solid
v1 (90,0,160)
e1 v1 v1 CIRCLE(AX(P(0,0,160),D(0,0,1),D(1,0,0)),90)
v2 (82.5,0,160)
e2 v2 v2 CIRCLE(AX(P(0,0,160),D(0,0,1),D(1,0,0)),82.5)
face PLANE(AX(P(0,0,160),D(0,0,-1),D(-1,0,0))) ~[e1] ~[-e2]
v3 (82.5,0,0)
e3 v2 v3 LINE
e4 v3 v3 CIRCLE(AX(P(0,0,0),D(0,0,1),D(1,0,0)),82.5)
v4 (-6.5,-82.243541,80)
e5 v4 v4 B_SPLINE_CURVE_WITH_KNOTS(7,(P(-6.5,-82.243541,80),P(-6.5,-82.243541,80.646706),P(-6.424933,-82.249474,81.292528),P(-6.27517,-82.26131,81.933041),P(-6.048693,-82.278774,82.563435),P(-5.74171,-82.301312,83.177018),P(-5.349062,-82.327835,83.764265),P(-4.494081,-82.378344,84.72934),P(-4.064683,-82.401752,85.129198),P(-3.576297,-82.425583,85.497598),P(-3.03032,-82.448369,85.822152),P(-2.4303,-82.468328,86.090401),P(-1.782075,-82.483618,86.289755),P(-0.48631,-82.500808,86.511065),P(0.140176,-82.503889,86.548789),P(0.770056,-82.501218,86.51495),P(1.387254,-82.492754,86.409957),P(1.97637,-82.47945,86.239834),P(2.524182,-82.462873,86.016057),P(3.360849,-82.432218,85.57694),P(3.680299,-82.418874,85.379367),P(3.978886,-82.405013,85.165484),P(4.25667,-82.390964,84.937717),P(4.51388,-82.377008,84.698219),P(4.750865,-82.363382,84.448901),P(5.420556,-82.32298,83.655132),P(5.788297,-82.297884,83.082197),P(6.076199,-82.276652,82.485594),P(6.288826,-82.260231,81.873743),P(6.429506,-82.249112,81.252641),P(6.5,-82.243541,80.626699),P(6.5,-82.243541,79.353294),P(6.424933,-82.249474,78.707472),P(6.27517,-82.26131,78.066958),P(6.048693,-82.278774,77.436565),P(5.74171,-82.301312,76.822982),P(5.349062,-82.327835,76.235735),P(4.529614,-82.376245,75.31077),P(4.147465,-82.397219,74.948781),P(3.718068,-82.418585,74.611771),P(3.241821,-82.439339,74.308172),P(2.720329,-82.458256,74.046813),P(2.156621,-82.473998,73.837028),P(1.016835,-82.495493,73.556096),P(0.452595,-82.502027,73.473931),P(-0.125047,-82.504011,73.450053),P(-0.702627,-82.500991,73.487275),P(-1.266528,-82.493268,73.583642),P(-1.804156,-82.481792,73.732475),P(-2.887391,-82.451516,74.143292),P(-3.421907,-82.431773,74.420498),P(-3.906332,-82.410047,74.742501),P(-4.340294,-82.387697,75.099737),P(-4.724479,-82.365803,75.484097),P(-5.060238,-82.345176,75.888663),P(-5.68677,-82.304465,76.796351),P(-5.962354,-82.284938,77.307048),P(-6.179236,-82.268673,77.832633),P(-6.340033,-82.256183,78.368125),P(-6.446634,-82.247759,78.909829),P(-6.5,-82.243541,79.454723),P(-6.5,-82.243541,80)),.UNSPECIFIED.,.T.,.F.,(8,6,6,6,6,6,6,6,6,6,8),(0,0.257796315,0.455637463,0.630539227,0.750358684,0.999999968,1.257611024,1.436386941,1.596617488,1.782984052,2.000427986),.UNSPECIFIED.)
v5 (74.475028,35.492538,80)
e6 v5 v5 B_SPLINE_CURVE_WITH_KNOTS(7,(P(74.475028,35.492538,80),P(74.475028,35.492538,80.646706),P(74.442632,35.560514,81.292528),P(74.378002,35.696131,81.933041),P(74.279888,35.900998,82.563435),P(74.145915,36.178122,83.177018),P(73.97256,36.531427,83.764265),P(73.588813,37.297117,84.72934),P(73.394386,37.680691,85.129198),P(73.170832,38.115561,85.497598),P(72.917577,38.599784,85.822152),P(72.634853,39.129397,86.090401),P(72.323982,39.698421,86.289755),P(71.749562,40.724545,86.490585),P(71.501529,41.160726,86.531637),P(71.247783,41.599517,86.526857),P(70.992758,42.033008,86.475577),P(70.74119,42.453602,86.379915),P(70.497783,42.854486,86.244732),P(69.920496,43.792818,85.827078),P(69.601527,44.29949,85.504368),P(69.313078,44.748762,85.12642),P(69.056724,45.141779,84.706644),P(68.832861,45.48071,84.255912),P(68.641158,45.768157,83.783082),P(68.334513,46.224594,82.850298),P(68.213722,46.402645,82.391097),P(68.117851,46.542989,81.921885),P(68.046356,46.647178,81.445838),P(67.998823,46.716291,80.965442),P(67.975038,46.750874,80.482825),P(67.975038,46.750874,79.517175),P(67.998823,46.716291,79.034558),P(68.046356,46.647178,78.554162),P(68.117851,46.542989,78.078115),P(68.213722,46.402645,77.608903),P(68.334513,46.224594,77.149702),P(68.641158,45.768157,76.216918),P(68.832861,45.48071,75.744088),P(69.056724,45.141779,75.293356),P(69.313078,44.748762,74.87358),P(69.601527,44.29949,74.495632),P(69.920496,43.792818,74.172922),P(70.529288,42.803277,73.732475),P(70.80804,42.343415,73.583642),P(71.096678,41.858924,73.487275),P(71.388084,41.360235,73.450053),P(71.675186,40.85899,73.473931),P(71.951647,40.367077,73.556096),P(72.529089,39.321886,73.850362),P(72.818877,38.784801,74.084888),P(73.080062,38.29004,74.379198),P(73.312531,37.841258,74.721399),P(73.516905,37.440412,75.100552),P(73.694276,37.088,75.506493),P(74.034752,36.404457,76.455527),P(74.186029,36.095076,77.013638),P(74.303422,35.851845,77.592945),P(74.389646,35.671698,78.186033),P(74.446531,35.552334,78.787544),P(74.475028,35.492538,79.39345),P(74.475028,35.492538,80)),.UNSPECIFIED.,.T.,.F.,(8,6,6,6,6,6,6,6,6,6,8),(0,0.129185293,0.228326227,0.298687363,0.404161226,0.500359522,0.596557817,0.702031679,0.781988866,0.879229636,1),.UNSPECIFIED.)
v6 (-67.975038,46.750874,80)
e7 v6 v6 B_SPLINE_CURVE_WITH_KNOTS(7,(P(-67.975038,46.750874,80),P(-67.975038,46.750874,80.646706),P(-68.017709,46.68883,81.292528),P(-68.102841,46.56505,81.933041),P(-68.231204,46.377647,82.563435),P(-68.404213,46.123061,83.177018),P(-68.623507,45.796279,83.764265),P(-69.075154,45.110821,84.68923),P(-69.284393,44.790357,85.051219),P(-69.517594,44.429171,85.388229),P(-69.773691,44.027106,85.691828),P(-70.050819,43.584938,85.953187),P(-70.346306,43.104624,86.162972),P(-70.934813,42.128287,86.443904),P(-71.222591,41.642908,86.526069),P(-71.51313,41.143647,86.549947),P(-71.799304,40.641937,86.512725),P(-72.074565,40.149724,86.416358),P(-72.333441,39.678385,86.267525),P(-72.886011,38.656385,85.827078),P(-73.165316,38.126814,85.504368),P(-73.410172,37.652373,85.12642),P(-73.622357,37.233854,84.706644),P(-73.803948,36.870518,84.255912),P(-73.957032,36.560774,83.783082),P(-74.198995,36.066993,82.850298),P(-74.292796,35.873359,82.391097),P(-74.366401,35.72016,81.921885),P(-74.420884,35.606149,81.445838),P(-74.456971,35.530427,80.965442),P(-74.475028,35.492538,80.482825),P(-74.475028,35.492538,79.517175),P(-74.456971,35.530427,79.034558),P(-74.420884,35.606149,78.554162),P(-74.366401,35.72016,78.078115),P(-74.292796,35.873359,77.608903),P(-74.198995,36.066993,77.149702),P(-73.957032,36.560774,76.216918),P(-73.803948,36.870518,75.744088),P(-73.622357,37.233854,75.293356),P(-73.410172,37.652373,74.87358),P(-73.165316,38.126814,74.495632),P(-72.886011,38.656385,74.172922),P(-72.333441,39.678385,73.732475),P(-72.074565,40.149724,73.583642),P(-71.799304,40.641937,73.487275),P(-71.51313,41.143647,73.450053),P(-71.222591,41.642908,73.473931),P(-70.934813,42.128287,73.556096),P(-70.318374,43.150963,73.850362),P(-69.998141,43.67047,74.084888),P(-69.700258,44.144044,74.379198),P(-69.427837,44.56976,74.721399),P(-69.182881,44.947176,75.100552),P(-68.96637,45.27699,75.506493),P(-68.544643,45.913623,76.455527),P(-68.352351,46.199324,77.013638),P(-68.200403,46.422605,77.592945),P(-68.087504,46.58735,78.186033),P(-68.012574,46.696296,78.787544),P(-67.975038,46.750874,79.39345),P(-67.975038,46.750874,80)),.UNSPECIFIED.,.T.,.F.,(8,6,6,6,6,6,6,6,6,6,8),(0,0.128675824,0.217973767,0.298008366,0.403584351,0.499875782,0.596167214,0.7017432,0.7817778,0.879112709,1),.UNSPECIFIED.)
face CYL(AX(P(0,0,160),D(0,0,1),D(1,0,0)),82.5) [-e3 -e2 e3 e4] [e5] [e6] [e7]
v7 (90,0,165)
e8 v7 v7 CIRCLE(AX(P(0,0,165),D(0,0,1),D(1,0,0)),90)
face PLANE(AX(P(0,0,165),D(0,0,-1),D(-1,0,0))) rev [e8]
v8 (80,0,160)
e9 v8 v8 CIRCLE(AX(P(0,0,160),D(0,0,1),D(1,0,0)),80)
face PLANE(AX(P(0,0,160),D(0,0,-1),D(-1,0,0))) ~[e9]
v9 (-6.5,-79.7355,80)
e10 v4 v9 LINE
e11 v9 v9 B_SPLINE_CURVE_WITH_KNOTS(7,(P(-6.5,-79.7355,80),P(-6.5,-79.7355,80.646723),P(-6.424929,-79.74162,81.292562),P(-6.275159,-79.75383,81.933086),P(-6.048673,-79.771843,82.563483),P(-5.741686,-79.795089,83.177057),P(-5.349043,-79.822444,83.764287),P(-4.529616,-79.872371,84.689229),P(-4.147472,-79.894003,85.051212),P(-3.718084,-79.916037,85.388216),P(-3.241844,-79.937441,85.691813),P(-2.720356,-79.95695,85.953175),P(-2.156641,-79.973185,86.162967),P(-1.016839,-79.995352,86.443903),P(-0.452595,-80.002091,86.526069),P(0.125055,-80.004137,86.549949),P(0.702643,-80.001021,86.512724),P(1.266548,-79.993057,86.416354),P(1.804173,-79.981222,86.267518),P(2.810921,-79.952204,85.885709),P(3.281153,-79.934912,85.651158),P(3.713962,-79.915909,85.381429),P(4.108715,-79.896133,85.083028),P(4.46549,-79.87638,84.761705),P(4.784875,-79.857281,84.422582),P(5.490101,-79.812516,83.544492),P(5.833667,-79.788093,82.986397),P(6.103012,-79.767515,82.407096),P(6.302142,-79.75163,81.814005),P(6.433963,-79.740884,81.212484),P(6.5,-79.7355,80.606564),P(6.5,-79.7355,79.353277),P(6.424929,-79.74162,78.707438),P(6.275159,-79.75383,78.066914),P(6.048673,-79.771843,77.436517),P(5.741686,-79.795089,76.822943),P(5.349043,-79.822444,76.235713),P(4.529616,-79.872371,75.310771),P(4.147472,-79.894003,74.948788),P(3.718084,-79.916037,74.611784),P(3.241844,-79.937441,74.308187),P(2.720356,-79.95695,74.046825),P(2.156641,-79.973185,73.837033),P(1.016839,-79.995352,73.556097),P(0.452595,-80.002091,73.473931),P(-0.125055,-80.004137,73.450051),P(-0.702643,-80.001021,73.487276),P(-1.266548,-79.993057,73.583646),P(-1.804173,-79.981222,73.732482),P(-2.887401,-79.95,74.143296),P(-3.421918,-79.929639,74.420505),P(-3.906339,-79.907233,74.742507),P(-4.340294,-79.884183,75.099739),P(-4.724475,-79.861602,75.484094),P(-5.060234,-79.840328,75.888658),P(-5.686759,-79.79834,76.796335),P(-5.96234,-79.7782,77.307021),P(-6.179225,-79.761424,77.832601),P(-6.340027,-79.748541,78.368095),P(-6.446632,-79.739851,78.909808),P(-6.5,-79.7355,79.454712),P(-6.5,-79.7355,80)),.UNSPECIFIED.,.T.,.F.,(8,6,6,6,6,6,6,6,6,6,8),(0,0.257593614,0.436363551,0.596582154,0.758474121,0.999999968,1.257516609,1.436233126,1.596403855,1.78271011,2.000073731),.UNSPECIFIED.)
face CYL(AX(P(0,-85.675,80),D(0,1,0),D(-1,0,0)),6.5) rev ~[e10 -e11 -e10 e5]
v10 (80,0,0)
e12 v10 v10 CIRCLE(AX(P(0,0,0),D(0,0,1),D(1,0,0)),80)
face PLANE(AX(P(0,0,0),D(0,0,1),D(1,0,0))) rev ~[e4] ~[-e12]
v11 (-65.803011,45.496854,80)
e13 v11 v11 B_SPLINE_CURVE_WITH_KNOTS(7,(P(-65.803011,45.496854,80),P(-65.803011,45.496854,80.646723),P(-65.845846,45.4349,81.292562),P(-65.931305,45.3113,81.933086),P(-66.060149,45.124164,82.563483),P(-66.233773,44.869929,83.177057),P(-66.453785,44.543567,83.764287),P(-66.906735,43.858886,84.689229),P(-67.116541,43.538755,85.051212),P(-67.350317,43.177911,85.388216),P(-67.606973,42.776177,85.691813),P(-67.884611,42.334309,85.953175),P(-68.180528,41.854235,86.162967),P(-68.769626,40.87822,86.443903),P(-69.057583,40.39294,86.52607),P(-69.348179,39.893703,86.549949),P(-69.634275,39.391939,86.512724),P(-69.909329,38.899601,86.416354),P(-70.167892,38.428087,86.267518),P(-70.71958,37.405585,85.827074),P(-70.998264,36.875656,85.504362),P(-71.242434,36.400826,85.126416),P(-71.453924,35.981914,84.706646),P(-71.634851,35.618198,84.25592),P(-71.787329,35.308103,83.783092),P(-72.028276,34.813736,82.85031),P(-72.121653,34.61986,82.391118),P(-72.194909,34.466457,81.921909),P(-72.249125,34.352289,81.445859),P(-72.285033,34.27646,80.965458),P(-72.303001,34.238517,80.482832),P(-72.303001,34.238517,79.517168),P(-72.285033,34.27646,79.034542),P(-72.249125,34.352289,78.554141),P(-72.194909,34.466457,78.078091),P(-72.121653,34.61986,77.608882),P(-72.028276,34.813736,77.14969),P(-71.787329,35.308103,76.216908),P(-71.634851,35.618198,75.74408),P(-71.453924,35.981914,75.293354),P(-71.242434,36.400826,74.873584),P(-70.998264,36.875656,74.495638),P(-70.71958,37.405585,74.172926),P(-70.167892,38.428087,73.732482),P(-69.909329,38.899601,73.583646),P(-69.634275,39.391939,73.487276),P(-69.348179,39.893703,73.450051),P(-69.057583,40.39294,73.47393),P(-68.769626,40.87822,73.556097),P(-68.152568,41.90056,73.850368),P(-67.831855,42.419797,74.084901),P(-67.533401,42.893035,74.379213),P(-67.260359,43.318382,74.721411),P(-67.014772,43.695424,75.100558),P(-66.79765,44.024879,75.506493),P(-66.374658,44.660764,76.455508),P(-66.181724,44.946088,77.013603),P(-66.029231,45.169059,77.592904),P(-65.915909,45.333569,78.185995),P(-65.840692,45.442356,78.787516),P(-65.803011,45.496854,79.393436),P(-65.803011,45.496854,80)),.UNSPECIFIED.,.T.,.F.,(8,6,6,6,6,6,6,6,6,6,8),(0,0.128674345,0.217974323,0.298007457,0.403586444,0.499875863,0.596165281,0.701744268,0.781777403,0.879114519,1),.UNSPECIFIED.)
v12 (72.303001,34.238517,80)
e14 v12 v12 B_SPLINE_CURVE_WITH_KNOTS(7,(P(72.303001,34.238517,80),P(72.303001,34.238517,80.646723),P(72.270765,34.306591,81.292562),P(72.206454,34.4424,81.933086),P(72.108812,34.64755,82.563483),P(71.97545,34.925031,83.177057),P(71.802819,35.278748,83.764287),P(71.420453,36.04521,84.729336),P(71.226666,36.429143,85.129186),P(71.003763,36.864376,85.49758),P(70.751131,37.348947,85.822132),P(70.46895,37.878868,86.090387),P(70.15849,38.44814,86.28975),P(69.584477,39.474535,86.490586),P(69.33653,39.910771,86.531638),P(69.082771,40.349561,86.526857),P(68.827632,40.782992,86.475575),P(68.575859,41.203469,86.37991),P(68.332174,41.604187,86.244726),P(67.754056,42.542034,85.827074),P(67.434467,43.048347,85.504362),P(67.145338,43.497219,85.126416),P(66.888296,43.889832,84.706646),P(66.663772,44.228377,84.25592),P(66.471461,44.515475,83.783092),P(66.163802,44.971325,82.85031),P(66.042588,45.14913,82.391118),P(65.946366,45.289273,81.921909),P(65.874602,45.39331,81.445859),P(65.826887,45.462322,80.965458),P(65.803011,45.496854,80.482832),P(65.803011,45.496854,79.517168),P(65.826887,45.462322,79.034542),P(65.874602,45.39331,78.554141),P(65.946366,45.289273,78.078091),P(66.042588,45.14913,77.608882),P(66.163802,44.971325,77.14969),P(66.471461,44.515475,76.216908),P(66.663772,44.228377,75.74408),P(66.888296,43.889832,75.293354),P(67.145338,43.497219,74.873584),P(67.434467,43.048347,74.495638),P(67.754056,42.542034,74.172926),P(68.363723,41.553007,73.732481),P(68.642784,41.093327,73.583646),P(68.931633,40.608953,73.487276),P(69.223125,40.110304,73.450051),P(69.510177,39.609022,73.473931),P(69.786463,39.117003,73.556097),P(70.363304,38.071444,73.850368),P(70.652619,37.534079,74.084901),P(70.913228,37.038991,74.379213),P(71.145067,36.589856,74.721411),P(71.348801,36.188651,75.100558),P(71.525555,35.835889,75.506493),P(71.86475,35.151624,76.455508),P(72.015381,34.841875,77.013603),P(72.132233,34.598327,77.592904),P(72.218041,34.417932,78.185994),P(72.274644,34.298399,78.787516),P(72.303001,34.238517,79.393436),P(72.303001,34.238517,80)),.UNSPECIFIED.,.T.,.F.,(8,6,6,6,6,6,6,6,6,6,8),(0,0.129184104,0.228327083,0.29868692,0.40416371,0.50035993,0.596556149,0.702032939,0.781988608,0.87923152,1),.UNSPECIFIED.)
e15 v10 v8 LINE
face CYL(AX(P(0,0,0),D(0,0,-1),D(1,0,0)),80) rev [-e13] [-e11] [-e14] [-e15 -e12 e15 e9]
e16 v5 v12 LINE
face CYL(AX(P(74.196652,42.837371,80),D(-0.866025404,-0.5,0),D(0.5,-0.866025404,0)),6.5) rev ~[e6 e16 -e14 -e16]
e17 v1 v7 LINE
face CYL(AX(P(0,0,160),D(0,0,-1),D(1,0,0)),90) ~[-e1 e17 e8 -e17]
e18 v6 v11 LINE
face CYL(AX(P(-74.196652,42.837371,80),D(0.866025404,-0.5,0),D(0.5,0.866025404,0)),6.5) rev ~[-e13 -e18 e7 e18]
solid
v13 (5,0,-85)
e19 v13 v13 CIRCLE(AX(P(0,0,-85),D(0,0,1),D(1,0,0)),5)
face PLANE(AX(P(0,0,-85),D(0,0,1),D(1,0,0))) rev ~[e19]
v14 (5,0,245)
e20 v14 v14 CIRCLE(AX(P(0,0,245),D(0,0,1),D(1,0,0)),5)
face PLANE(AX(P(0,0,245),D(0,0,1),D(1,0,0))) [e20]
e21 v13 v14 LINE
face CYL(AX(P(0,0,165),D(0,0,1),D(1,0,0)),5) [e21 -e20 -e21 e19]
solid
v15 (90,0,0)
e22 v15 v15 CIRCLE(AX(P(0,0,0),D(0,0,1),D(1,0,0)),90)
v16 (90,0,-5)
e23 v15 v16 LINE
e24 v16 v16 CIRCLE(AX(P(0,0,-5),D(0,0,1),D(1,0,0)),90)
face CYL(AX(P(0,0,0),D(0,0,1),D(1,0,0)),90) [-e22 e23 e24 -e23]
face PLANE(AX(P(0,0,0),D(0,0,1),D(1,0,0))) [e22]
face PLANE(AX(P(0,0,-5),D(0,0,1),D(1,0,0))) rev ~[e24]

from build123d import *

# Parameters (mm, degrees)
F0_R            = 82.5
F0_R_2          = 80
F1_DEPTH        = 80
F0_R_3          = 90
F3_DEPTH        = 5
F7_D            = 13
F7_DEPTH        = 3.175
F7_TIP          = 3.9055940237
F7_COPIES_COUNT = 3
F8_R            = 5
F9_DEPTH        = 80
F9_DEPTH_BACK   = 250


# Not quite as in the source:
# - a pattern or mirror of a feature is missing from the dataset's text; its kind, count and spacing are read off the source's solid


with BuildPart() as f1:
    # F0 (on Top) → F1 (new body)
    with BuildSketch(Plane.XY):
        Circle(F0_R)
        Circle(F0_R_2, mode=Mode.SUBTRACT)
    extrude(amount=F1_DEPTH)

    # F4: F1, F3 across plane


with BuildPart() as f3:
    # F0 (on Top) → F3 (new body)
    with BuildSketch(Plane.XY):
        Circle(F0_R_3)
        Circle(F0_R, mode=Mode.SUBTRACT)
        Circle(F0_R)
        Circle(F0_R_2, mode=Mode.SUBTRACT)
        Circle(F0_R_2)
    extrude(amount=-F3_DEPTH)


with BuildPart() as f1_1:
    add(f1.part)
    add(f1.part.mirror(Plane.XY.offset(80)))
    add(f3.part.mirror(Plane.XY.offset(80)))

    # F7
    with Locations(Plane.XZ.offset(82.5)):
        with Locations((0, 80)):
            f7 = Hole(F7_D / 2, depth=F7_DEPTH)
            with Locations((0, 0, -(F7_DEPTH + F7_TIP / 2))):  # 118° drill point
                Cone(0, F7_D / 2, F7_TIP, mode=Mode.SUBTRACT)

    # F7_copies: F7 ×3 about axis
    f7_copies_axis = Axis((0, -8.6e-05, 0), (0, 0, 1))
    for i in range(1, F7_COPIES_COUNT):
        add(f7.rotate(f7_copies_axis, i * 360 / F7_COPIES_COUNT), mode=Mode.SUBTRACT)


with BuildPart() as f9:
    # F8 (on face) → F9 (new body, two sides)
    with BuildSketch(Plane.XY.offset(165)) as f9_sk:
        Circle(F8_R)
    extrude(amount=F9_DEPTH)
    extrude(f9_sk.sketch, amount=-F9_DEPTH_BACK)


solid = Compound([f3.part, f1_1.part, f9.part])
